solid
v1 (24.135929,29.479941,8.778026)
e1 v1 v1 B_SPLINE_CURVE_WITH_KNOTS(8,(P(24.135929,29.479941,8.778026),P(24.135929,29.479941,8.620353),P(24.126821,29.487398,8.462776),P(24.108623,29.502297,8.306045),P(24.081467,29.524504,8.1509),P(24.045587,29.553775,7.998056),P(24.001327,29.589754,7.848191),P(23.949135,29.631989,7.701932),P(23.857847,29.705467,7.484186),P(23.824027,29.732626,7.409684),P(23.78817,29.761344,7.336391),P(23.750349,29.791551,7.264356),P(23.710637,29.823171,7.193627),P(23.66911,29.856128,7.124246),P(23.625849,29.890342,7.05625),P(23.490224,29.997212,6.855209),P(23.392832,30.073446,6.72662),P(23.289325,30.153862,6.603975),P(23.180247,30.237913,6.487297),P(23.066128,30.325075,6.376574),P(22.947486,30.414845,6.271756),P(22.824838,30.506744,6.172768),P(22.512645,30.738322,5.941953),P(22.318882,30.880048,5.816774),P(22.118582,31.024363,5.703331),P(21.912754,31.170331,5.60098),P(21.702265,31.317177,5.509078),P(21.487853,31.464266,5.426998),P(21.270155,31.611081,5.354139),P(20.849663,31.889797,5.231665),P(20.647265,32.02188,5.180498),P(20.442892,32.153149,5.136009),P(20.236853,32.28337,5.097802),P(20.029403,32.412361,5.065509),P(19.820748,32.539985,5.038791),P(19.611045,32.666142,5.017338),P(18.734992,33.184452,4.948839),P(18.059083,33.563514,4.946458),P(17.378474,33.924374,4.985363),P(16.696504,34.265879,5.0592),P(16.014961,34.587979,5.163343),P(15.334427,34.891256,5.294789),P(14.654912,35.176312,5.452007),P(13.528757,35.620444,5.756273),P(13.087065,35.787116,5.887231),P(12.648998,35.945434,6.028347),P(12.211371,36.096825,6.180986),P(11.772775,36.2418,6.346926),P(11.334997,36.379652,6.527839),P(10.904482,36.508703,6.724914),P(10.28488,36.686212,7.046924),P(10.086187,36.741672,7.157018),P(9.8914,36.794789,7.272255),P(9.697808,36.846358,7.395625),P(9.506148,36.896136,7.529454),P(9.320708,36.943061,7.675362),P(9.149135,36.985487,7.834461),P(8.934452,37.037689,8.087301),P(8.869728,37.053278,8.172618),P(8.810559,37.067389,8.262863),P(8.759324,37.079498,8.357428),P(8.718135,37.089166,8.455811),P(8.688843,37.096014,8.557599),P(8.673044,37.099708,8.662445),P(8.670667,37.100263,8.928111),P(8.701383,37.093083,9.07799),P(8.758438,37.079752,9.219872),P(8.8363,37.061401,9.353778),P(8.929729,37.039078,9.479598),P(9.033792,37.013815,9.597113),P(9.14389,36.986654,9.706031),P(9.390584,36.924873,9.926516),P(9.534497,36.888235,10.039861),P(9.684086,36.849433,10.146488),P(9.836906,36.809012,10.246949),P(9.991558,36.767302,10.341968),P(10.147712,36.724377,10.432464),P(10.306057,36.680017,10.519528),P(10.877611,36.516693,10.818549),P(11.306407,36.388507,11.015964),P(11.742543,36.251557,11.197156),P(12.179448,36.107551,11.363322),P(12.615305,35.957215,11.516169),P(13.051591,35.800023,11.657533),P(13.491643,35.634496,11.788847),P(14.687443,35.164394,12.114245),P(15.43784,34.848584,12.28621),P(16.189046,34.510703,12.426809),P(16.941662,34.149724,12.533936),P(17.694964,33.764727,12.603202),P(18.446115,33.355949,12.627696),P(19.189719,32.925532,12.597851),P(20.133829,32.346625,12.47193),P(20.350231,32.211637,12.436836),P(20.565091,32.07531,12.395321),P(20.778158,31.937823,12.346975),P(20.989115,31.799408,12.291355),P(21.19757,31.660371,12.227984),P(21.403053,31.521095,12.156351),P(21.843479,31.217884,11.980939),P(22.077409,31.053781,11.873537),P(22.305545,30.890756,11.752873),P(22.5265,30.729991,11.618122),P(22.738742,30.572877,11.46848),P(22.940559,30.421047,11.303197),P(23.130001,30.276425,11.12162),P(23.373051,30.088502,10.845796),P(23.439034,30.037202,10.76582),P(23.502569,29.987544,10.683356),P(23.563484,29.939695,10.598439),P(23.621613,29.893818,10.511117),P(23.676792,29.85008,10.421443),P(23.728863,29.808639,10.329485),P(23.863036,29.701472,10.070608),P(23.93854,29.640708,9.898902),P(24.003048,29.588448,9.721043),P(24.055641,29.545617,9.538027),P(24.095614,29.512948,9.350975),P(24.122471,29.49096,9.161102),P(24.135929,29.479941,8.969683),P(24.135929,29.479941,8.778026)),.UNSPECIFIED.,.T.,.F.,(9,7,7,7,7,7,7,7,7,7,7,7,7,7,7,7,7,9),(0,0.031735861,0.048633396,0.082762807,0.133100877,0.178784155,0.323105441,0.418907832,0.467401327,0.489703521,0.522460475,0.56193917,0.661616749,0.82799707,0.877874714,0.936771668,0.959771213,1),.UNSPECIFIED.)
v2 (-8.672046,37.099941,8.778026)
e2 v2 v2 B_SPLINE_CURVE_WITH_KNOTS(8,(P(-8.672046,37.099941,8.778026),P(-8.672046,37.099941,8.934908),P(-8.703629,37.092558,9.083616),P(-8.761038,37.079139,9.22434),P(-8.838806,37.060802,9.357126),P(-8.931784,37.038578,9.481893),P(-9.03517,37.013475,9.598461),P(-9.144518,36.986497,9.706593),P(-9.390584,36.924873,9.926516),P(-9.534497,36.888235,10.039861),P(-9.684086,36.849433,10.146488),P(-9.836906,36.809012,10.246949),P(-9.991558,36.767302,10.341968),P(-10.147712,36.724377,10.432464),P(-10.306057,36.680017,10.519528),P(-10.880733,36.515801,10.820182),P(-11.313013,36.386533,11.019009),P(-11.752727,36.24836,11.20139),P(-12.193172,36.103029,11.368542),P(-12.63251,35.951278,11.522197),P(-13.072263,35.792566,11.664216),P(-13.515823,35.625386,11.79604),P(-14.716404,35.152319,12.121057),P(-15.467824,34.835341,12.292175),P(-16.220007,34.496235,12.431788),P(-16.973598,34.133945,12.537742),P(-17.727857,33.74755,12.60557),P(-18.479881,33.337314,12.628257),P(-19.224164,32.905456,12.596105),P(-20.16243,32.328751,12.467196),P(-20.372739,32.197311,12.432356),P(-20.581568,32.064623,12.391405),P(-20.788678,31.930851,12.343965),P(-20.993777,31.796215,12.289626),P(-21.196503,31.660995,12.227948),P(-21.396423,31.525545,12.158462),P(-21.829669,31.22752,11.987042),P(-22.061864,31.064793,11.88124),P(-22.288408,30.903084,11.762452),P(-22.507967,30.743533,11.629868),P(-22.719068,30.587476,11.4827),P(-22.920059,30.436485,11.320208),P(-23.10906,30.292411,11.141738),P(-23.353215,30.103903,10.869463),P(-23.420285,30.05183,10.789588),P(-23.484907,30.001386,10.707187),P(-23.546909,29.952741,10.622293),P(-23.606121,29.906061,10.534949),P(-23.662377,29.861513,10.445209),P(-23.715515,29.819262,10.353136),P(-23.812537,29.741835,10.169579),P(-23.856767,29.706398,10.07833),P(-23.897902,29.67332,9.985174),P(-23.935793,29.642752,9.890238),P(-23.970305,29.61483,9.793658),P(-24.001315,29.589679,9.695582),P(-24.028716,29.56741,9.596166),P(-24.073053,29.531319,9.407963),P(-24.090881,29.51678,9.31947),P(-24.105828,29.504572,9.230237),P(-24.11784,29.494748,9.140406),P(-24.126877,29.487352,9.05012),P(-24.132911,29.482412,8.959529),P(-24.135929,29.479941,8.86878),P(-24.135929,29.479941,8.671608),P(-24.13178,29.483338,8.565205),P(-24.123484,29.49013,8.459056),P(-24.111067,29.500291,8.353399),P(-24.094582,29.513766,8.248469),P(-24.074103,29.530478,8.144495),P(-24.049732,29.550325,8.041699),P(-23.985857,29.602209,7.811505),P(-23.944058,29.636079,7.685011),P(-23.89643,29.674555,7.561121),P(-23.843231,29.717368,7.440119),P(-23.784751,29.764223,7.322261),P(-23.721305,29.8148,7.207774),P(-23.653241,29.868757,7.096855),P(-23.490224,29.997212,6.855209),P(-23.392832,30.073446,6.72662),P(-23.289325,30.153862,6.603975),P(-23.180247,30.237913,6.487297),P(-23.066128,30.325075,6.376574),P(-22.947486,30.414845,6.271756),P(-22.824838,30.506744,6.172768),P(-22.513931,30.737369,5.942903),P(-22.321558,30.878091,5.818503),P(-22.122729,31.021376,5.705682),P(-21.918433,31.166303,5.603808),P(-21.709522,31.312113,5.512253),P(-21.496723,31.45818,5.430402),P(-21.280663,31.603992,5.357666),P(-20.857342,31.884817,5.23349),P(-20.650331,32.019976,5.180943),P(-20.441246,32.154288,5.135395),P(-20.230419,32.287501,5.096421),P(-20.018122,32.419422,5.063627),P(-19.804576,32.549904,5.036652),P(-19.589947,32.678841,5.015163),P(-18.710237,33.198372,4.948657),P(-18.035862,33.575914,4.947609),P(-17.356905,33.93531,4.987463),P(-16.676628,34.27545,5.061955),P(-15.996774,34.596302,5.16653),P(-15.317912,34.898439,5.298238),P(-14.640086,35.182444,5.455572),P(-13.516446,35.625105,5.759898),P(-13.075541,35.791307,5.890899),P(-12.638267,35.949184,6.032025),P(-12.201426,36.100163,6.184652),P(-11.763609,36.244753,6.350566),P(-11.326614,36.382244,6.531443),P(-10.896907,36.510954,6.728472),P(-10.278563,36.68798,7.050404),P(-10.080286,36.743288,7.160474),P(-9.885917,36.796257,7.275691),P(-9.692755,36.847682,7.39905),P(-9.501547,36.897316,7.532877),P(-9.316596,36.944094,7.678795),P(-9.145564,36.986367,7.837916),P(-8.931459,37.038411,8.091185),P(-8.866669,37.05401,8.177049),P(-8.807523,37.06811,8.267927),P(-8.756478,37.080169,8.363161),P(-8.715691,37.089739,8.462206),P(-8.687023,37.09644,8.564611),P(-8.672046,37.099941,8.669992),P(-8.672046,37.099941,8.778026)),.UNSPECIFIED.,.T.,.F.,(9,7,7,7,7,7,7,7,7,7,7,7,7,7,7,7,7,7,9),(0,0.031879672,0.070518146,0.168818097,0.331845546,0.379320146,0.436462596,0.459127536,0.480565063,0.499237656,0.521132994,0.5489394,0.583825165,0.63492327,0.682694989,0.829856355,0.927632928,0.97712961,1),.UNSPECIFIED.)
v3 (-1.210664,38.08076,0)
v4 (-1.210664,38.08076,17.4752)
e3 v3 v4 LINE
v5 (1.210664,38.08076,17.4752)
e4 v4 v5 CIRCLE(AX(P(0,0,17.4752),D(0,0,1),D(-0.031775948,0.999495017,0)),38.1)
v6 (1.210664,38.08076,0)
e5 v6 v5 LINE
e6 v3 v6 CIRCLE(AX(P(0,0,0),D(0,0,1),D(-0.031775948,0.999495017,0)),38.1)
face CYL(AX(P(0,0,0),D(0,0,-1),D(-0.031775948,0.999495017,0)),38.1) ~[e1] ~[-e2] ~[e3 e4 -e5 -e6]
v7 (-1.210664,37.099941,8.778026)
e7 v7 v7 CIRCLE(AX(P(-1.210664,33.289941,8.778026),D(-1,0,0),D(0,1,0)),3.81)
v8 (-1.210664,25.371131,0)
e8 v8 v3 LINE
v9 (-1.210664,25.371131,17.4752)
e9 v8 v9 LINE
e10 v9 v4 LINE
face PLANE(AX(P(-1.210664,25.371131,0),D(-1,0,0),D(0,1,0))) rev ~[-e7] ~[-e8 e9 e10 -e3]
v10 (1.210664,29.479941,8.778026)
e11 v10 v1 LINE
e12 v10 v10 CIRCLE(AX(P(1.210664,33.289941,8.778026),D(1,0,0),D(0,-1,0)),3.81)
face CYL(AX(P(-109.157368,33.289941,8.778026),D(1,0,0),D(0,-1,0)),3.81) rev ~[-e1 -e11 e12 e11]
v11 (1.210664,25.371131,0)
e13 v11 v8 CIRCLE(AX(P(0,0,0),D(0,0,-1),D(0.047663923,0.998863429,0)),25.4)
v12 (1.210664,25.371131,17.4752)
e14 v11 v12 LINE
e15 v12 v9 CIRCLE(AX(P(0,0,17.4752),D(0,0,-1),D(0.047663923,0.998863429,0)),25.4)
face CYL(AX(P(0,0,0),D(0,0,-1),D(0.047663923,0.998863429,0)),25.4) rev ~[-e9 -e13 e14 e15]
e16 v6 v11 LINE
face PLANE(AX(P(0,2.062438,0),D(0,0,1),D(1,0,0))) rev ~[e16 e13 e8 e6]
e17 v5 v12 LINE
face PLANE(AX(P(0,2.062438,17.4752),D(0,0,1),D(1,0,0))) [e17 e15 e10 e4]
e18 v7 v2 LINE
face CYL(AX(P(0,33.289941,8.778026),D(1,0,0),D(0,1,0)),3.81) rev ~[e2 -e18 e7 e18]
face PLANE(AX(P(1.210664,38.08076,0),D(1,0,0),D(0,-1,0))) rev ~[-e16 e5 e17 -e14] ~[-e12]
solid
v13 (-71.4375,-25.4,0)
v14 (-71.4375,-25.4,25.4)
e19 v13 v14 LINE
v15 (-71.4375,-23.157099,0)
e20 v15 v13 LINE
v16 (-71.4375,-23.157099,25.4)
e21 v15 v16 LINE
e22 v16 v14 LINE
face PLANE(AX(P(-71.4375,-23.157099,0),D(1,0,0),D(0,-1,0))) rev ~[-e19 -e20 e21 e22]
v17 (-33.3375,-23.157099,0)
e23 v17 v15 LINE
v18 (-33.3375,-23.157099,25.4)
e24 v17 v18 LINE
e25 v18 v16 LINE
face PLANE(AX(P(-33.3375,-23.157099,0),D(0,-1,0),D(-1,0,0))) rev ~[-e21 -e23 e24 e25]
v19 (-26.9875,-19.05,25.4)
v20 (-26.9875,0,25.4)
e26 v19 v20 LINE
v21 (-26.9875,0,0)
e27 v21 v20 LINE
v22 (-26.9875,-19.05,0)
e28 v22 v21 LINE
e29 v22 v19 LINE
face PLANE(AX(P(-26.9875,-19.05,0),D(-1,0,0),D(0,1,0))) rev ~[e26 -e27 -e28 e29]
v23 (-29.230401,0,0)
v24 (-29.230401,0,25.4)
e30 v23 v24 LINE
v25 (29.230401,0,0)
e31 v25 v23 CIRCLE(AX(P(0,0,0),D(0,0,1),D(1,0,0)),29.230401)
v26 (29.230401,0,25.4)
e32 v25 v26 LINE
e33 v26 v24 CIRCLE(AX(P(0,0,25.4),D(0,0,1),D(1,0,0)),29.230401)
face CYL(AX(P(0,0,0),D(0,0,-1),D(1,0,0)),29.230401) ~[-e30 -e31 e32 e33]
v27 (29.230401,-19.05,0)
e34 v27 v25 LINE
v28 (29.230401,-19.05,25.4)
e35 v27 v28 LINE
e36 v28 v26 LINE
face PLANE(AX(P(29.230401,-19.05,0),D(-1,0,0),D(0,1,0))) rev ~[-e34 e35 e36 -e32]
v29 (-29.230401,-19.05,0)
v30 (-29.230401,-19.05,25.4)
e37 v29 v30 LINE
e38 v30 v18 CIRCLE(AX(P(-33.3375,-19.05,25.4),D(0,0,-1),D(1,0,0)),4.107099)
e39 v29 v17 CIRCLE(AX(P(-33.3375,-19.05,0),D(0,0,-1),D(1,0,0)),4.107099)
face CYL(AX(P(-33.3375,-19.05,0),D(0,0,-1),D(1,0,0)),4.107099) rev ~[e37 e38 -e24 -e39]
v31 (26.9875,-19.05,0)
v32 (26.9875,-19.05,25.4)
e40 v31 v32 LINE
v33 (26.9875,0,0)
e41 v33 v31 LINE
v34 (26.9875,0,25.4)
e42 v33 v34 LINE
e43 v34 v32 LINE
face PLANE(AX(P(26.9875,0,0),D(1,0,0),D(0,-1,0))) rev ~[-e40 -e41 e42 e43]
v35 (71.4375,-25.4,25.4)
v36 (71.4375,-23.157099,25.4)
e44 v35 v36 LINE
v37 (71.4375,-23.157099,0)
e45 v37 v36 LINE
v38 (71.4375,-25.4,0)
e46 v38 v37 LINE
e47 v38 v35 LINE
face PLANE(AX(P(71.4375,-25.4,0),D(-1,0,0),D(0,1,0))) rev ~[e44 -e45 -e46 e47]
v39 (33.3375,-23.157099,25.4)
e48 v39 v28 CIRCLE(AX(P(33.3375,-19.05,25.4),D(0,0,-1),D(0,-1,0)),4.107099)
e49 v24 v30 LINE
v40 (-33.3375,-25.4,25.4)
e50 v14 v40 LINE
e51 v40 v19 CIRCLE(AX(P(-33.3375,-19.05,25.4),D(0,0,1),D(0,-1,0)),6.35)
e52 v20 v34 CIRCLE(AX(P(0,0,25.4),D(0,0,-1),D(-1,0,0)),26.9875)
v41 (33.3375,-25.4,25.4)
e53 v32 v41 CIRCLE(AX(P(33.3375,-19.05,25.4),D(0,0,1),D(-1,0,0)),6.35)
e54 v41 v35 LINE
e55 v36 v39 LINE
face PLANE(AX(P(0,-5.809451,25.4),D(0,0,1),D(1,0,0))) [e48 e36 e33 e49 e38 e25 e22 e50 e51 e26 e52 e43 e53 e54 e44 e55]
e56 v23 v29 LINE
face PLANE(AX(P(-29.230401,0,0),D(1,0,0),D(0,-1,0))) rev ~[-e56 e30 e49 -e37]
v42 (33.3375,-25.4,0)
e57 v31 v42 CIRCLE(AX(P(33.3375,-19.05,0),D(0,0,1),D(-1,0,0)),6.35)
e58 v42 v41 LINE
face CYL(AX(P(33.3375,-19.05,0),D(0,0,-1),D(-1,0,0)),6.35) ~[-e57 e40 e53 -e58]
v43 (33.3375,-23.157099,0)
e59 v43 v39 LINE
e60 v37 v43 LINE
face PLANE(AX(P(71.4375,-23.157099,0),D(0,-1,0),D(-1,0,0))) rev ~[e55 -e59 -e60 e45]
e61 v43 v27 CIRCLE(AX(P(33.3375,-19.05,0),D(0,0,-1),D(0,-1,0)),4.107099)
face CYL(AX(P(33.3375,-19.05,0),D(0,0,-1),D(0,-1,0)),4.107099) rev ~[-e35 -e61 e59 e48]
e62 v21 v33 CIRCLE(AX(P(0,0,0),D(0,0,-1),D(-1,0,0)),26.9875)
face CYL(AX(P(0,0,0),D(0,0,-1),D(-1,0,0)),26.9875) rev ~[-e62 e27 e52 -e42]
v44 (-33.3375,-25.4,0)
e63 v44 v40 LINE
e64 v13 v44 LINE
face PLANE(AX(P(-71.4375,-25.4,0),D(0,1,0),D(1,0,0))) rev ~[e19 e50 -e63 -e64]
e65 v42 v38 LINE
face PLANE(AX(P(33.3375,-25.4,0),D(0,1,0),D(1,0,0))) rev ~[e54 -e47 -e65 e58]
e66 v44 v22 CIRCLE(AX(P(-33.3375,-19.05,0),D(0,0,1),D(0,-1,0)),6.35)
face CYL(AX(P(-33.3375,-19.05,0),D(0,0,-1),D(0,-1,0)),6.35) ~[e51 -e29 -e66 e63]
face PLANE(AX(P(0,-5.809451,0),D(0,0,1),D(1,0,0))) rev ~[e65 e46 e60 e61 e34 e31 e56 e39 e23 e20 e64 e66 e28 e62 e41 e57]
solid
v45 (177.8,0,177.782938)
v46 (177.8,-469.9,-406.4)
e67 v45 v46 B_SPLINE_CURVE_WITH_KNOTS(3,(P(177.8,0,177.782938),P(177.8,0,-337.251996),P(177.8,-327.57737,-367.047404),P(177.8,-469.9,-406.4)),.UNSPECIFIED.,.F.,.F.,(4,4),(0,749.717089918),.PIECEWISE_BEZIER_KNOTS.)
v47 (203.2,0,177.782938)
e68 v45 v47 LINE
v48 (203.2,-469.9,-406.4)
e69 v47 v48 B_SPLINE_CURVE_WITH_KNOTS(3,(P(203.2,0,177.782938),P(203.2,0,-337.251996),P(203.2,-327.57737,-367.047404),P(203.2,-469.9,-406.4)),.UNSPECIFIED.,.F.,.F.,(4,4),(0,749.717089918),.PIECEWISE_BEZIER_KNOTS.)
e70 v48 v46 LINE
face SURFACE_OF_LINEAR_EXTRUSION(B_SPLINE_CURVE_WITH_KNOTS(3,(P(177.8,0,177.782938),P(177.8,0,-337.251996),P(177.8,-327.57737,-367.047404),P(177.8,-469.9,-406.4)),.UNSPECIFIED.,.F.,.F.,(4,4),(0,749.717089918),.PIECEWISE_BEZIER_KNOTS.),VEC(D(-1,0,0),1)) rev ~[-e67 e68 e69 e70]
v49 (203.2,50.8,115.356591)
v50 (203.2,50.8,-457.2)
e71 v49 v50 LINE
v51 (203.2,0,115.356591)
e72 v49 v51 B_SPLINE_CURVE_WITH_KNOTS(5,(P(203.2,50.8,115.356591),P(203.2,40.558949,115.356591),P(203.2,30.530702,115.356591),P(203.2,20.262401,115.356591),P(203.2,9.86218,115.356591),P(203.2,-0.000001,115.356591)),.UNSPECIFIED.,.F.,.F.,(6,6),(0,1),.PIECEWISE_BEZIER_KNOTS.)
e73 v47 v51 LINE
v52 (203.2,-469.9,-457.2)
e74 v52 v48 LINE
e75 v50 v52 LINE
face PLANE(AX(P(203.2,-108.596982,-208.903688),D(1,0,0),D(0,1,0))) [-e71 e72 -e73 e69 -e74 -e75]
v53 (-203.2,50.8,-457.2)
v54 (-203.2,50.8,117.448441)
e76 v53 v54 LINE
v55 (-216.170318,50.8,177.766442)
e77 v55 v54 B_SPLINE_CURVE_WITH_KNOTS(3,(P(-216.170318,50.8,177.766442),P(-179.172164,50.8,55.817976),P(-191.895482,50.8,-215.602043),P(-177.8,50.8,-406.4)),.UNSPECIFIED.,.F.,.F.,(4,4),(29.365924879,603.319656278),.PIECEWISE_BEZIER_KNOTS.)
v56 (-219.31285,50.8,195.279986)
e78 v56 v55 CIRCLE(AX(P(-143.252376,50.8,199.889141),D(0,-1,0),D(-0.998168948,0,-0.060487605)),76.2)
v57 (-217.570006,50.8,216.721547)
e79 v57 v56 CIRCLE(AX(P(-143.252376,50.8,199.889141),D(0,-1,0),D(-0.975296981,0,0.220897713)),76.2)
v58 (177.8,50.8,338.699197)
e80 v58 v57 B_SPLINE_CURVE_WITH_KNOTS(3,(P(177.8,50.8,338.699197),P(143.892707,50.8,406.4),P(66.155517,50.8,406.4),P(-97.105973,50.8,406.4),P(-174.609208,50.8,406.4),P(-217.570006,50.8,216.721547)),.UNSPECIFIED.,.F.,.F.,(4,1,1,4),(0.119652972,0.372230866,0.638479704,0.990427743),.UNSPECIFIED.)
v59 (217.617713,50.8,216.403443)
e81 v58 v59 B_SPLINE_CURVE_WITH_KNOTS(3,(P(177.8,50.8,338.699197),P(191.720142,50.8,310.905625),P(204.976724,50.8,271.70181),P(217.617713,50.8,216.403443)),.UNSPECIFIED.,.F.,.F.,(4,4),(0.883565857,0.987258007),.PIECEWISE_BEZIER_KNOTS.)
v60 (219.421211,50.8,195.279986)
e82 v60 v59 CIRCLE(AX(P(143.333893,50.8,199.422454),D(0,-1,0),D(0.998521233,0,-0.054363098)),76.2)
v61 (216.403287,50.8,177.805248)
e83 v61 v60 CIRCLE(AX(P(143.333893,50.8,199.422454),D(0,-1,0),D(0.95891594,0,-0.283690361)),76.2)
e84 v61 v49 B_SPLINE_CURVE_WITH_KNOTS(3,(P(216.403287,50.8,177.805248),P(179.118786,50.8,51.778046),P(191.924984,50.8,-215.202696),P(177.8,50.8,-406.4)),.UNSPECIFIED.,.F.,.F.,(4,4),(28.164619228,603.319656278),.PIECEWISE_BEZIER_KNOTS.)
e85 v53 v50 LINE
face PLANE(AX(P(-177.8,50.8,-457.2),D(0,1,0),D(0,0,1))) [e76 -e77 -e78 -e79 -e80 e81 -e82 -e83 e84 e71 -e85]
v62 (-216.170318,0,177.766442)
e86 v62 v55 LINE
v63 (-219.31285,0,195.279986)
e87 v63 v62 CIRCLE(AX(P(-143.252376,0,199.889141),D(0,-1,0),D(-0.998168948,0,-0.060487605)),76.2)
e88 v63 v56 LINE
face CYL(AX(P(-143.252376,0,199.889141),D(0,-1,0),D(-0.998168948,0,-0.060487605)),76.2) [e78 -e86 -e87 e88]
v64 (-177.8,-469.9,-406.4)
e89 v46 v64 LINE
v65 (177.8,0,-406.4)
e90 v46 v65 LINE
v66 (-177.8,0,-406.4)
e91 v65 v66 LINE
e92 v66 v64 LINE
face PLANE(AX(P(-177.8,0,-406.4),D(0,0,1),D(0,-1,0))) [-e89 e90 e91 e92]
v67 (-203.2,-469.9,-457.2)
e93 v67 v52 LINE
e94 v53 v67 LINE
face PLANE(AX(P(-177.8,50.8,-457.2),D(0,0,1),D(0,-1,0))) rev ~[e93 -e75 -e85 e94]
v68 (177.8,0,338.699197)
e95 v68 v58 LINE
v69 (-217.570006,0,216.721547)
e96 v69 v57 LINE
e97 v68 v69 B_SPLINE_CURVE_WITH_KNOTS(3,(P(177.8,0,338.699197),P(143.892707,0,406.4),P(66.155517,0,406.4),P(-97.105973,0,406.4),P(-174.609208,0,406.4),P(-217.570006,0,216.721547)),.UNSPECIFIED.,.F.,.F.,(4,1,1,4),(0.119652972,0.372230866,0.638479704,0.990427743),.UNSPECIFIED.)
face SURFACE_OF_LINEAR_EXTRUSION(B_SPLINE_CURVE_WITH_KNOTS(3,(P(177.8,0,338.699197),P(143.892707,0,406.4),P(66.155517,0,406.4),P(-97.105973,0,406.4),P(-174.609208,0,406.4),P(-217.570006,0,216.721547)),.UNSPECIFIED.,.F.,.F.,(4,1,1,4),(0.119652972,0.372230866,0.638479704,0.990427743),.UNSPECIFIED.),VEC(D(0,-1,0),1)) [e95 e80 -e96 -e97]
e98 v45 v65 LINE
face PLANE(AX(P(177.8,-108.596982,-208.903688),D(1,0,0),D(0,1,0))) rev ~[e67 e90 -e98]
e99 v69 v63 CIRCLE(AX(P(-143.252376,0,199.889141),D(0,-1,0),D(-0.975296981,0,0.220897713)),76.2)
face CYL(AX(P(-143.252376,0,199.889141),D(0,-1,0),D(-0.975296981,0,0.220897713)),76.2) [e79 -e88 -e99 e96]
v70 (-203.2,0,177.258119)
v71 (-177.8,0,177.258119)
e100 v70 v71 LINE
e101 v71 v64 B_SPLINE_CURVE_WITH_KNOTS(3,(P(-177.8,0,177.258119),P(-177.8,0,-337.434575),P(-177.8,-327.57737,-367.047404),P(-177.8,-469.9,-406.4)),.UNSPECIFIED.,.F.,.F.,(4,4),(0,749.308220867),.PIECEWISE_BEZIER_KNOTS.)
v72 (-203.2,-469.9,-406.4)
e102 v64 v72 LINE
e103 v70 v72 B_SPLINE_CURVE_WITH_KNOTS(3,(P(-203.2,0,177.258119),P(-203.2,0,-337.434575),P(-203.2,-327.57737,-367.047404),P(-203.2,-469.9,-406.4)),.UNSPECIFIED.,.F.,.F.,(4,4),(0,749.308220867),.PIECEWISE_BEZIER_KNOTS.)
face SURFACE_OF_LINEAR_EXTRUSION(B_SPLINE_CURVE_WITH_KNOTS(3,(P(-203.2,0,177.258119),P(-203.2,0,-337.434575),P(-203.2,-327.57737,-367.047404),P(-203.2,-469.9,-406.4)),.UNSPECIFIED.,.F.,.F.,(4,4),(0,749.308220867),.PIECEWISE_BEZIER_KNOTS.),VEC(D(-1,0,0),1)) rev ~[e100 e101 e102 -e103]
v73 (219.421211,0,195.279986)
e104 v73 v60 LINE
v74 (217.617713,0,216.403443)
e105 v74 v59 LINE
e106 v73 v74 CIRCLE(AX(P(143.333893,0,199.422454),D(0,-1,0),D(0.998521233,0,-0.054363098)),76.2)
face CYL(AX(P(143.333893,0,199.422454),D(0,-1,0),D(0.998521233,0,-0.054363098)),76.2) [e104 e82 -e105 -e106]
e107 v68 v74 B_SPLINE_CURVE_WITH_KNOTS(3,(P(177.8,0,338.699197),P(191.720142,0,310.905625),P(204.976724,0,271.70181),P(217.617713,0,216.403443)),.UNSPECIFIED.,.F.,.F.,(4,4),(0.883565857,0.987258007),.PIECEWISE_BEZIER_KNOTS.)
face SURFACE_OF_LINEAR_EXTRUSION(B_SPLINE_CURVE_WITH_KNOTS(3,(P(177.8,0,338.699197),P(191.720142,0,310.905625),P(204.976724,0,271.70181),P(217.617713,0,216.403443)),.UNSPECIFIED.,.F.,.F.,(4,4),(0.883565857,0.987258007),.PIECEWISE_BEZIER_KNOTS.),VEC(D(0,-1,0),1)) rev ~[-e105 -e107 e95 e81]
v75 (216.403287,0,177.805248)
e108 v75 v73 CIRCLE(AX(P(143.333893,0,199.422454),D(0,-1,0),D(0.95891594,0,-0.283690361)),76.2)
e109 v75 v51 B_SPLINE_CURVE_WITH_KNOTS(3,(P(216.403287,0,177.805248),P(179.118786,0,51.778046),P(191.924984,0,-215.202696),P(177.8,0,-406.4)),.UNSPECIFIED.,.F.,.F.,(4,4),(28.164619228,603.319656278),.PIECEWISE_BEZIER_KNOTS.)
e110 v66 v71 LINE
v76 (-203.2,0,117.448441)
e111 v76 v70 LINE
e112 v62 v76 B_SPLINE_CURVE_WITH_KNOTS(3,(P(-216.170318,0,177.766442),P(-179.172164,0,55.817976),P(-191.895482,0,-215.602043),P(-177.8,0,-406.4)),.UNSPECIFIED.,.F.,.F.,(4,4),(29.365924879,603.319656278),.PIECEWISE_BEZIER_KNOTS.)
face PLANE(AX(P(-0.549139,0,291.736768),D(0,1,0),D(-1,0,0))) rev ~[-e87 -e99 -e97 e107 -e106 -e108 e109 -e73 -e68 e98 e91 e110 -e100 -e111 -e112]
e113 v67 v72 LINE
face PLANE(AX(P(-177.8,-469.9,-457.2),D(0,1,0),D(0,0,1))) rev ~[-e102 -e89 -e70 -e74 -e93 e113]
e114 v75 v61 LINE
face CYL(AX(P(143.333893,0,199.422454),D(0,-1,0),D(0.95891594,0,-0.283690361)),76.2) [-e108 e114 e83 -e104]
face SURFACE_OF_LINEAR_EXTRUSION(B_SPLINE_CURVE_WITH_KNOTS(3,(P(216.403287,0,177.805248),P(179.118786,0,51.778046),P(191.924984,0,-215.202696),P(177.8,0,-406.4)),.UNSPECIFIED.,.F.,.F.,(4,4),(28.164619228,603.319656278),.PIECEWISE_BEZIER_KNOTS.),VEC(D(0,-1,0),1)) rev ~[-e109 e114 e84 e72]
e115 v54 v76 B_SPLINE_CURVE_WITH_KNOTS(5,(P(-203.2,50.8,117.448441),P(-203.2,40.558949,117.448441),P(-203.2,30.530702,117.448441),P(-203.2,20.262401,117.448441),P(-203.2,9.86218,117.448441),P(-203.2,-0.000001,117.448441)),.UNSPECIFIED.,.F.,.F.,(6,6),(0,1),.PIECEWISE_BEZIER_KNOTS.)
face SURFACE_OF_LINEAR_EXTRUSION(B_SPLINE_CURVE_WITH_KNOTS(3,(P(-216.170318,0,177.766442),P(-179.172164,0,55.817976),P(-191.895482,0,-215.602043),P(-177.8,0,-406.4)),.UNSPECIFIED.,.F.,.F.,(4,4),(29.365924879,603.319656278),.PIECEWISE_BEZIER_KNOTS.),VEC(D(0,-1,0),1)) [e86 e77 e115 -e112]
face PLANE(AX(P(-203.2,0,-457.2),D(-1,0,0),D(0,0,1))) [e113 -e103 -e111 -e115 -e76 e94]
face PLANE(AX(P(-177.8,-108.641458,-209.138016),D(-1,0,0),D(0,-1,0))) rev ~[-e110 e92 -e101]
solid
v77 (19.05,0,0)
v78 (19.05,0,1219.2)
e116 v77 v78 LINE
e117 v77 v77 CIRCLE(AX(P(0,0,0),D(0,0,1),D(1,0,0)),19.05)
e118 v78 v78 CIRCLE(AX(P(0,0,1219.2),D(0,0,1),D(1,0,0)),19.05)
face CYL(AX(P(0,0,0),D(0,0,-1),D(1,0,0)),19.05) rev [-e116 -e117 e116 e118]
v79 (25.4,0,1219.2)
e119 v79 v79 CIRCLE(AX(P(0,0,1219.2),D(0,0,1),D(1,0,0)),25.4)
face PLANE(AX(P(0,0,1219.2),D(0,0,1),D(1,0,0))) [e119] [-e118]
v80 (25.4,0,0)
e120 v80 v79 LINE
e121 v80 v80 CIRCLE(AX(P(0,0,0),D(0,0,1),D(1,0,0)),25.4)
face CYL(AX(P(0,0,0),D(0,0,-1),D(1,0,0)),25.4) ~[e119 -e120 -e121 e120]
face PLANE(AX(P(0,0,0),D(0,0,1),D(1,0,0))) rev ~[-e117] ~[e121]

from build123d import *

# Parameters (mm, degrees)
F0_R      = 25.4
F0_R_2    = 19.05
F1_DEPTH  = 1219.2
F2_DEPTH  = 25.4
F4_DEPTH  = 17.4752
F6_D      = 7.62
F6_DEPTH  = 38.101
F7_D      = 7.62
F8_W      = 355.6
F8_H      = 50.8
F9_DEPTH  = 50.8
F11_DEPTH = 469.9
F12_DEPTH = 25.4
F14_DEPTH = 25.4
F15_DEPTH = 25.4


with BuildPart() as f1:
    # F0 (on Top) → F1 (new body)
    with BuildSketch(Plane.XY):
        Circle(F0_R)
        Circle(F0_R_2, mode=Mode.SUBTRACT)
    extrude(amount=F1_DEPTH)


with BuildPart() as f2:
    # F0 (on Top) → F2 (new body)
    with BuildSketch(Plane.XY):
        with BuildLine():
            Line((-26.9875, -19.05), (-26.9875, 0))
            ThreePointArc((-26.9875, 0), (0, 26.9875), (26.9875, 0))
            Line((26.9875, 0), (26.9875, -19.05))
            ThreePointArc((26.9875, -19.05), (28.8473719395, -23.5401280605), (33.3375, -25.4))
            Line((33.3375, -25.4), (71.4375, -25.4))
            Line((71.4375, -25.4), (71.4375, -23.1570992619))
            Line((71.4375, -23.1570992619), (33.3375, -23.1570992619))
            ThreePointArc((33.3375, -23.1570992619), (30.4333422609, -21.9541577391), (29.2304007381, -19.05))
            Line((29.2304007381, -19.05), (29.2304007381, 0))
            ThreePointArc((29.2304007381, 0), (0, 29.2304007381), (-29.2304007381, 0))
            Line((-29.2304007381, 0), (-29.2304007381, -19.05))
            ThreePointArc((-29.2304007381, -19.05), (-30.4333422609, -21.9541577391), (-33.3375, -23.1570992619))
            Line((-33.3375, -23.1570992619), (-71.4375, -23.1570992619))
            Line((-71.4375, -23.1570992619), (-71.4375, -25.4))
            Line((-71.4375, -25.4), (-33.3375, -25.4))
            ThreePointArc((-33.3375, -25.4), (-28.8473719395, -23.5401280605), (-26.9875, -19.05))
        make_face()
    extrude(amount=F2_DEPTH)


with BuildPart() as f4:
    # F3 (on Top) → F4 (new body)
    with BuildSketch(Plane.XY):
        with BuildLine():
            Line((-1.210663635, 25.3711311053), (-1.210663635, 38.0807601495))
            ThreePointArc((-1.210663635, 38.0807601495), (0, -38.1), (1.210663635, 38.0807601495))
            Line((1.210663635, 38.0807601495), (1.210663635, 25.3711311053))
            ThreePointArc((1.210663635, 25.3711311053), (0, -25.4), (-1.210663635, 25.3711311053))
        make_face()
    extrude(amount=F4_DEPTH)

    # F6 (through all, one way)
    with BuildSketch(Plane.YZ):
        with Locations((33.2899410278, 8.7780257373)):
            Circle(F6_D / 2)
    extrude(amount=-F6_DEPTH, mode=Mode.SUBTRACT)

    # F7 (through all)
    with Locations(Plane(origin=(0, 0, 0), x_dir=(0, 1, 0), z_dir=(-1, 0, 0))):
        with Locations((33.2899410278, -8.7780257373)):
            Hole(F7_D / 2)


with BuildPart() as f9:
    # F8 (on Front) → F9 (new body)
    with BuildSketch(Plane.XZ):
        with BuildLine():
            add(Edge.make_bspline(
                [(-10.5840112569, 406.4), (14.3579992132, 406.4), (84.774969433, 406.4), (143.8927068177, 406.4), (177.8, 338.6991968772)],
                knots=[0.4890074401, 0.4890074401, 0.4890074401, 0.4890074401, 0.6309879631, 0.8835658569, 0.8835658569, 0.8835658569, 0.8835658569], degree=3))
            add(Edge.make_bspline(
                [(-177.8, 342.347117997), (-146.667200487, 406.4), (-96.3951234553, 406.4), (-32.4144817487, 406.4), (-10.5840112569, 406.4)],
                knots=[0.1196529721, 0.1196529721, 0.1196529721, 0.1196529721, 0.364739125, 0.4890074401, 0.4890074401, 0.4890074401, 0.4890074401], degree=3))
            Line((-177.8, 342.347117997), (-177.8, 195.2799856663))
            Line((-177.8, 195.2799856663), (0, 195.2799856663))
            Line((0, 195.2799856663), (177.8, 195.2799856663))
            Line((177.8, 195.2799856663), (177.8, 338.6991968772))
        make_face()
        with BuildLine():
            add(Edge.make_bspline(
                [(177.8, 338.6991968772), (191.7201419538, 310.905625011), (204.9767238239, 271.7018098175), (217.617713139, 216.4034432339)],
                knots=[0.8835658569, 0.8835658569, 0.8835658569, 0.8835658569, 0.987258007, 0.987258007, 0.987258007, 0.987258007], degree=3))
            Line((177.8, 338.6991968772), (177.8, 195.2799856663))
            Line((177.8, 195.2799856663), (219.4212105721, 195.2799856663))
            ThreePointArc((219.4212105721, 195.2799856663), (219.2576697661, 205.9047418246), (217.617713139, 216.4034432339))
        make_face()
        with BuildLine():
            Line((-177.8, 195.2799856663), (-177.8, 342.347117997))
            add(Edge.make_bspline(
                [(-217.5700060395, 216.7215468508), (-204.5258308337, 274.3135632336), (-191.3744497579, 314.4189315762), (-177.8, 342.347117997)],
                knots=[0.0127910862, 0.0127910862, 0.0127910862, 0.0127910862, 0.1196529721, 0.1196529721, 0.1196529721, 0.1196529721], degree=3))
            ThreePointArc((-217.5700060395, 216.7215468508), (-219.2018900162, 206.0625792295), (-219.3128499865, 195.2799856663))
            Line((-219.3128499865, 195.2799856663), (-177.8, 195.2799856663))
        make_face()
        with BuildLine():
            Line((219.4212105721, 195.2799856663), (177.8, 195.2799856663))
            Line((177.8, 195.2799856663), (177.8, -406.4))
            add(Edge.make_bspline(
                [(216.4032871844, 177.8052482541), (179.1187861214, 51.7780463516), (191.9249839566, -215.2026964108), (177.8, -406.4)],
                knots=[28.1646192279, 28.1646192279, 28.1646192279, 28.1646192279, 603.319656278, 603.319656278, 603.319656278, 603.319656278], degree=3))
            ThreePointArc((216.4032871844, 177.8052482541), (218.4223260439, 186.454525576), (219.4212105721, 195.2799856663))
        make_face()
        Polygon((177.8, -406.4), (177.8, 195.2799856663), (0, 195.2799856663), (-177.8, 195.2799856663), (-177.8, -406.4), align=None)
        with BuildLine():
            Line((-177.8, -406.4), (-177.8, 195.2799856663))
            Line((-177.8, 195.2799856663), (-219.3128499865, 195.2799856663))
            ThreePointArc((-219.3128499865, 195.2799856663), (-218.2545301806, 186.4311737852), (-216.1703176559, 177.76644236))
            add(Edge.make_bspline(
                [(-216.1703176559, 177.76644236), (-179.1721643238, 55.8179762585), (-191.8954816103, -215.602043346), (-177.8, -406.4)],
                knots=[29.3659248791, 29.3659248791, 29.3659248791, 29.3659248791, 603.319656278, 603.319656278, 603.319656278, 603.319656278], degree=3))
        make_face()
        with Locations((0, -431.8)):
            Rectangle(F8_W, F8_H)
    extrude(amount=-F9_DEPTH)

    # F8 (on Front) → F11 (join)
    with BuildSketch(Plane.XZ):
        with Locations((0, -431.8)):
            Rectangle(F8_W, F8_H)
    extrude(amount=F11_DEPTH)

    # F12 (add, symmetric): faces of the model
    f12_faces = [f9.faces().sort_by_distance(p)[0] for p in [
        (177.8, -209.55, -431.8),
        (-177.8, -209.55, -431.8),
    ]]
    extrude(f12_faces, amount=F12_DEPTH, both=True, dir=(1, 0, 0))

    # F10 (on face) → F14 (join)
    with BuildSketch(Plane.YZ.offset(177.8)):
        with BuildLine():
            Line((50.8, 177.7829378843), (0, 177.7829378843))
            add(Edge.make_bspline(
                [(0, 177.7829378843), (0, -337.2519960899), (-327.5773703098, -367.0474041939), (-469.9, -406.4)],
                knots=[0, 0, 0, 0, 749.717089918, 749.717089918, 749.717089918, 749.717089918], degree=3))
            Line((-469.9, -406.4), (50.8, -406.4))
            Line((50.8, -406.4), (50.8, 177.7829378843))
        make_face()
    extrude(amount=F14_DEPTH)

    # F13 (on face) → F15 (join)
    with BuildSketch(Plane(origin=(-203.2, 0, 0), x_dir=(0, -1, 0), z_dir=(-1, 0, 0))):
        with BuildLine():
            Line((0, 177.2581189871), (-50.8, 177.2581189871))
            Line((-50.8, 177.2581189871), (-50.8, -406.4))
            Line((-50.8, -406.4), (469.9, -406.4))
            add(Edge.make_bspline(
                [(0, 177.2581189871), (0, -337.4345749617), (327.5773703098, -367.0474041939), (469.9, -406.4)],
                knots=[0, 0, 0, 0, 749.3082208674, 749.3082208674, 749.3082208674, 749.3082208674], degree=3))
        make_face()
    extrude(amount=-F15_DEPTH)


solid = Compound([f1.part, f2.part, f4.part, f9.part])
